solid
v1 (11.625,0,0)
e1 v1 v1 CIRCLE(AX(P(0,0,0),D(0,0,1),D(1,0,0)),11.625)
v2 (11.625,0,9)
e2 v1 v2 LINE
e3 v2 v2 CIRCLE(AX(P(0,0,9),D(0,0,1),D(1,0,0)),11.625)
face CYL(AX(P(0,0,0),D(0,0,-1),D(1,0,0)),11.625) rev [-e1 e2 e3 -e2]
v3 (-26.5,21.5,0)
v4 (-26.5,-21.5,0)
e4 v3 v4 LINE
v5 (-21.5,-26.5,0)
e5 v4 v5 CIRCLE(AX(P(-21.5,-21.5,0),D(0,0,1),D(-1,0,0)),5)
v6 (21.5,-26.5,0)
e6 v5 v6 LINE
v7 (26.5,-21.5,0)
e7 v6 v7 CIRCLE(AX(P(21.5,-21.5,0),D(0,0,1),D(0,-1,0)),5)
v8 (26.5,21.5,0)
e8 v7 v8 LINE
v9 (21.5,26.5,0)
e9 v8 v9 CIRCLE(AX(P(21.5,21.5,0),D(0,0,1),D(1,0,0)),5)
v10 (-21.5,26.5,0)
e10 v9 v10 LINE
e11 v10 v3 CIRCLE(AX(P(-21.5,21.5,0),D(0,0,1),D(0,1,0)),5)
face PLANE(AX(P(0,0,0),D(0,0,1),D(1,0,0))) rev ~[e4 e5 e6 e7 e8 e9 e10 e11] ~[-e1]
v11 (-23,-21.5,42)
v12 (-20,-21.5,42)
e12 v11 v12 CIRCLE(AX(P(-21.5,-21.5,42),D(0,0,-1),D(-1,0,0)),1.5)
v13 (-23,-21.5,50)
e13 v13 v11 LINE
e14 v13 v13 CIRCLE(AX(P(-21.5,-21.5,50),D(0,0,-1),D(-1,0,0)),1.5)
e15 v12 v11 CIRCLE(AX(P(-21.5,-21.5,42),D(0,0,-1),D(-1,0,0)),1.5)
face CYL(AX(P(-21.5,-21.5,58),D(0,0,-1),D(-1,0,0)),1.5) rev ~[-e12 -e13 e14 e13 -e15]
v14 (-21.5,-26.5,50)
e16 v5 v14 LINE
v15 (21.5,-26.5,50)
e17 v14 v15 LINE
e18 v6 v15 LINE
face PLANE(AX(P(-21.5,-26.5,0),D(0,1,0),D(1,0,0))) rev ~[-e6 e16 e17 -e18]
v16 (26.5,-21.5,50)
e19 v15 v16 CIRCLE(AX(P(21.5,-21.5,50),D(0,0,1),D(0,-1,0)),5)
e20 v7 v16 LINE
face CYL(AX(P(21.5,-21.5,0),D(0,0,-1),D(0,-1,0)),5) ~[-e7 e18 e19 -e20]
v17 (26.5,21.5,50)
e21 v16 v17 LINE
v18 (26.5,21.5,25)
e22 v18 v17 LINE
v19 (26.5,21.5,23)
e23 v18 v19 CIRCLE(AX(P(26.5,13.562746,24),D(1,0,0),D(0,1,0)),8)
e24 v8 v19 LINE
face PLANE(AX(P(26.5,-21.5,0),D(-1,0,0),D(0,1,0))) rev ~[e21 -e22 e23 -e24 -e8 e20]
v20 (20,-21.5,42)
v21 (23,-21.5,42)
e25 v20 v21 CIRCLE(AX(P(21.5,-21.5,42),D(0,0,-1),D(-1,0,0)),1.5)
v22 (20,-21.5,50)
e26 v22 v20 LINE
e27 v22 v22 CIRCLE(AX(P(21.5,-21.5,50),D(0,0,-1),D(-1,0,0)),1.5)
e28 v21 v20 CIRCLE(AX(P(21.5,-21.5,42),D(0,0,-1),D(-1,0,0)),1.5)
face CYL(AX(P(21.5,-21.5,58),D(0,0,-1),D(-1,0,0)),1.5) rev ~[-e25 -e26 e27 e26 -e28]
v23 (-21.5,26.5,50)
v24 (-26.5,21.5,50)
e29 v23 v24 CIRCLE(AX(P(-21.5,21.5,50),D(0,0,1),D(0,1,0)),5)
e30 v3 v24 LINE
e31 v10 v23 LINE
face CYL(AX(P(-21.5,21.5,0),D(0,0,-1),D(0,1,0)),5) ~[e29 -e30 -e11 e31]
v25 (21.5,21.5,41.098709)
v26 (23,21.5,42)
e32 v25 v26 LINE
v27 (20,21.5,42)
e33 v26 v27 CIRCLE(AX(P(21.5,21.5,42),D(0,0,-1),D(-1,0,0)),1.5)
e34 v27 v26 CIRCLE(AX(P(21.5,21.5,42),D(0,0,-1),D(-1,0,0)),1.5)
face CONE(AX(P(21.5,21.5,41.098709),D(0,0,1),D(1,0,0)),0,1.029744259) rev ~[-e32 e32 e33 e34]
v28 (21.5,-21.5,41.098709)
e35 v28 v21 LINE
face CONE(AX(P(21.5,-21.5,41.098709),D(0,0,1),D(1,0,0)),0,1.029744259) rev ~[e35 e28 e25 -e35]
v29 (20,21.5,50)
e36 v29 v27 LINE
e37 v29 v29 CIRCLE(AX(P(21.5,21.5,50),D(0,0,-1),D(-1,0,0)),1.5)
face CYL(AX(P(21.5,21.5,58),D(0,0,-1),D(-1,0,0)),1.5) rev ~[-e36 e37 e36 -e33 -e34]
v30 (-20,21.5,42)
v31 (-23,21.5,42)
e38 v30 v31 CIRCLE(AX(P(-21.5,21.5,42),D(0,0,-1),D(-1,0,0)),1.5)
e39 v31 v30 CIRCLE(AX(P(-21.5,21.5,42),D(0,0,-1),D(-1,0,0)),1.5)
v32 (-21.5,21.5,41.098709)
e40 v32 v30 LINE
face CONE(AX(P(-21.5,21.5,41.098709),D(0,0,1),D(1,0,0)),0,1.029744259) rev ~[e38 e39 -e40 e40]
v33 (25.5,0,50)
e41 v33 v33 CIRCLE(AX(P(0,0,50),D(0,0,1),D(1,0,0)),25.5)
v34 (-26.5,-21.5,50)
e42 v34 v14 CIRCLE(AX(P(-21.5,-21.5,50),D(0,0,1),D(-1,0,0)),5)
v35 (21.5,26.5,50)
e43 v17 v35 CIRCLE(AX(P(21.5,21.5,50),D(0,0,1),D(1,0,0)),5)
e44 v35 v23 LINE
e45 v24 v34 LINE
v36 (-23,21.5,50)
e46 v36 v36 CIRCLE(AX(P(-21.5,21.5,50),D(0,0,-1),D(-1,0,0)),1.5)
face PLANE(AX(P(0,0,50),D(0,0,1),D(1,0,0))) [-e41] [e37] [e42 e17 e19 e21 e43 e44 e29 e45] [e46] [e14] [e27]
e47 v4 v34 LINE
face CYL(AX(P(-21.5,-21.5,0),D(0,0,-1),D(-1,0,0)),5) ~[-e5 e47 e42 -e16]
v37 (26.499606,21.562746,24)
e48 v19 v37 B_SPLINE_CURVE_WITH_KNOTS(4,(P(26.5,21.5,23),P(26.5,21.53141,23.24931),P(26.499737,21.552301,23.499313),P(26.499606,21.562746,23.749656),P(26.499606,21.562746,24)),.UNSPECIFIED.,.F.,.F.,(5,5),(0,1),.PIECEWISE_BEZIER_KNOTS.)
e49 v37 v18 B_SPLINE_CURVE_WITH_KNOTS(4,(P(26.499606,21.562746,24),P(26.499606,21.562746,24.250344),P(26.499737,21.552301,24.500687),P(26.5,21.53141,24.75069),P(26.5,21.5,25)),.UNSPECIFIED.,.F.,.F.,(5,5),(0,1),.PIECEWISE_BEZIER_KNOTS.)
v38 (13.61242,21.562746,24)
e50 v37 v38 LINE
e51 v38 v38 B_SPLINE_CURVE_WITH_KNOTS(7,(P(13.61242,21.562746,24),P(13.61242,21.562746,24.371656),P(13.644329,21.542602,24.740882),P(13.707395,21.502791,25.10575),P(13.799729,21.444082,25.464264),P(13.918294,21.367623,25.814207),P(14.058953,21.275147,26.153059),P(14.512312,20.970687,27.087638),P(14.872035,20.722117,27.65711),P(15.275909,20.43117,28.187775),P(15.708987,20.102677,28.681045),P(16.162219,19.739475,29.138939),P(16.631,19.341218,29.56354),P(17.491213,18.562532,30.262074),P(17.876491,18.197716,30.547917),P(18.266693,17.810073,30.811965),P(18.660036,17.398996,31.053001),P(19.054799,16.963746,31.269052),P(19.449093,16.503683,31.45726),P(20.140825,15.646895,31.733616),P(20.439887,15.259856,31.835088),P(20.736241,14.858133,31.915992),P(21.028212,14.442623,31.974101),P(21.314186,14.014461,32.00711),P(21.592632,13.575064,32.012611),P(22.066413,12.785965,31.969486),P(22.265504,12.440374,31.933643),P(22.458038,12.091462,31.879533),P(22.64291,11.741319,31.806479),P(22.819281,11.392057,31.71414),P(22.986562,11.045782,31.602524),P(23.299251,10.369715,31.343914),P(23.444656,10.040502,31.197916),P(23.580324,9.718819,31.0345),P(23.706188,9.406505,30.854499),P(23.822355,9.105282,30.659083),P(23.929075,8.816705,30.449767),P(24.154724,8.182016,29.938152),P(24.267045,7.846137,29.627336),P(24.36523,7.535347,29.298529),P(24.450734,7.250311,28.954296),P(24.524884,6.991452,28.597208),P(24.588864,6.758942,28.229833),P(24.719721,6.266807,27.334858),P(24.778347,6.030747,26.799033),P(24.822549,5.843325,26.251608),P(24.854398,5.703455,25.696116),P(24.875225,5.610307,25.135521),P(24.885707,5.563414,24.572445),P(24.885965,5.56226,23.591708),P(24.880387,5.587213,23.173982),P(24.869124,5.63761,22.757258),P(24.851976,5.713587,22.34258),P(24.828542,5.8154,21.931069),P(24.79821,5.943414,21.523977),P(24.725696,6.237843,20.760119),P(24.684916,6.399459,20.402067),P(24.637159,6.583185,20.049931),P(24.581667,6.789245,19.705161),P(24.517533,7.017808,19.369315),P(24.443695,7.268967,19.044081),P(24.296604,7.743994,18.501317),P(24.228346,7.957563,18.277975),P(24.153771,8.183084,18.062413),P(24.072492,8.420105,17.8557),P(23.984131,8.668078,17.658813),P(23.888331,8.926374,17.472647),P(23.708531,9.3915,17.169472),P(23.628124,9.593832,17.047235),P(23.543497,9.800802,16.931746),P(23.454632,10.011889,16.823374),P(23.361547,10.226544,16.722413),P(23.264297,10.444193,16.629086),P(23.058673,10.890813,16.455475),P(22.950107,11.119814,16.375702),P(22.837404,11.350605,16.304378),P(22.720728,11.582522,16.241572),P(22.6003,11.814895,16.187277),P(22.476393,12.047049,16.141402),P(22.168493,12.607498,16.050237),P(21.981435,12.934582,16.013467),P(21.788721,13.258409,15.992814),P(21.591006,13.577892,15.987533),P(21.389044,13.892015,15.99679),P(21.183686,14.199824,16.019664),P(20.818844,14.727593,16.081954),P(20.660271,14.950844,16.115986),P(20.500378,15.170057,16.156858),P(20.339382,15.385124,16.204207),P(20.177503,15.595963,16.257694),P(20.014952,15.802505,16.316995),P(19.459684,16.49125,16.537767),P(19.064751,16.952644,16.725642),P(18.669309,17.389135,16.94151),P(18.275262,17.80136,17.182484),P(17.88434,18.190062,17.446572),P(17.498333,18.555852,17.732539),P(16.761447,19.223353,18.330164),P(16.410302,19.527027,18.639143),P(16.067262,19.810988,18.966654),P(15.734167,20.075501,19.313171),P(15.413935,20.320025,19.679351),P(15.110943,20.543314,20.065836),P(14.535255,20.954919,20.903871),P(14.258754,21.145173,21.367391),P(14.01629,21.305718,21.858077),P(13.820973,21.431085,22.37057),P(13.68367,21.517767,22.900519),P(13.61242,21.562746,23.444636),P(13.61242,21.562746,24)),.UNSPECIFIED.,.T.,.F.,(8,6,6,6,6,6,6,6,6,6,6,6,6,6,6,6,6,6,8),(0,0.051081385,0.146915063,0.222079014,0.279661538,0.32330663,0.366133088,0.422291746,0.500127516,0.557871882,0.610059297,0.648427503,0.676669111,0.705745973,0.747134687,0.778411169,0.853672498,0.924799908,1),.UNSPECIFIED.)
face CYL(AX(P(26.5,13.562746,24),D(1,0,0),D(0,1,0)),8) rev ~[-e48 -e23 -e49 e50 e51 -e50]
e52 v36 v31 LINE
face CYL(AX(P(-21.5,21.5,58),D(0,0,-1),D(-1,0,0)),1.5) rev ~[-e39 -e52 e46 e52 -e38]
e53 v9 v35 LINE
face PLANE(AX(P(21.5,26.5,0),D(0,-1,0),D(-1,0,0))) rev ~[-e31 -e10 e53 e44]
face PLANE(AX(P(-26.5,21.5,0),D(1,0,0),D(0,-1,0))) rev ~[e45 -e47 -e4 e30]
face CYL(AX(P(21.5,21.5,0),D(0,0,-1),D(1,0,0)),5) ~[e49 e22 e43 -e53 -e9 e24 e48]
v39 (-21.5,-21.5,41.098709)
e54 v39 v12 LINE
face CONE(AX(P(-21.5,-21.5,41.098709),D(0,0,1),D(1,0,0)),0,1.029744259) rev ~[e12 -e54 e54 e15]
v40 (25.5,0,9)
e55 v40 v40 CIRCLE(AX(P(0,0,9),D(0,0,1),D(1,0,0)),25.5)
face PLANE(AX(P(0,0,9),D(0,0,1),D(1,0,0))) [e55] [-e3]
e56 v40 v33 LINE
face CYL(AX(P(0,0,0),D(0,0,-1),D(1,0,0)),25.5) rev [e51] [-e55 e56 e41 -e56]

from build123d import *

# Parameters (mm, degrees)
F0_R     = 25.5
F1_DEPTH = 50
F0_R_2   = 11.625
F2_DEPTH = 9
F4_R     = 8
F5_DEPTH = 15
F8_D     = 3
F8_DEPTH = 8
F8_TIP   = 0.9012909285


with BuildPart() as f1:
    # F0 (on Top) → F1 (new body)
    with BuildSketch(Plane.XY):
        with BuildLine():
            Line((21.5, 26.5), (-21.5, 26.5))
            ThreePointArc((-21.5, 26.5), (-25.0355339059, 25.0355339059), (-26.5, 21.5))
            Line((-26.5, 21.5), (-26.5, -21.5))
            ThreePointArc((-26.5, -21.5), (-25.0355339059, -25.0355339059), (-21.5, -26.5))
            Line((-21.5, -26.5), (21.5, -26.5))
            ThreePointArc((21.5, -26.5), (25.0355339059, -25.0355339059), (26.5, -21.5))
            Line((26.5, -21.5), (26.5, 21.5))
            ThreePointArc((26.5, 21.5), (25.0355339059, 25.0355339059), (21.5, 26.5))
        make_face()
        Circle(F0_R, mode=Mode.SUBTRACT)
    extrude(amount=F1_DEPTH)

    # F0 (on Top) → F2 (join)
    with BuildSketch(Plane.XY):
        Circle(F0_R)
        Circle(F0_R_2, mode=Mode.SUBTRACT)
    extrude(amount=F2_DEPTH)

    # F4 (on offset) → F5 (cut)
    with BuildSketch(Plane.YZ.offset(26.5)):
        with Locations((13.5627460668, 24)):
            Circle(F4_R)
    extrude(amount=-F5_DEPTH, mode=Mode.SUBTRACT)

    # F8
    with Locations(Plane.XY.offset(50)):
        with Locations((-21.5, 21.5), (21.5, 21.5), (21.5, -21.5), (-21.5, -21.5)):
            Hole(F8_D / 2, depth=F8_DEPTH)
            with Locations((0, 0, -(F8_DEPTH + F8_TIP / 2))):  # 118° drill point
                Cone(0, F8_D / 2, F8_TIP, mode=Mode.SUBTRACT)


solid = f1.part
